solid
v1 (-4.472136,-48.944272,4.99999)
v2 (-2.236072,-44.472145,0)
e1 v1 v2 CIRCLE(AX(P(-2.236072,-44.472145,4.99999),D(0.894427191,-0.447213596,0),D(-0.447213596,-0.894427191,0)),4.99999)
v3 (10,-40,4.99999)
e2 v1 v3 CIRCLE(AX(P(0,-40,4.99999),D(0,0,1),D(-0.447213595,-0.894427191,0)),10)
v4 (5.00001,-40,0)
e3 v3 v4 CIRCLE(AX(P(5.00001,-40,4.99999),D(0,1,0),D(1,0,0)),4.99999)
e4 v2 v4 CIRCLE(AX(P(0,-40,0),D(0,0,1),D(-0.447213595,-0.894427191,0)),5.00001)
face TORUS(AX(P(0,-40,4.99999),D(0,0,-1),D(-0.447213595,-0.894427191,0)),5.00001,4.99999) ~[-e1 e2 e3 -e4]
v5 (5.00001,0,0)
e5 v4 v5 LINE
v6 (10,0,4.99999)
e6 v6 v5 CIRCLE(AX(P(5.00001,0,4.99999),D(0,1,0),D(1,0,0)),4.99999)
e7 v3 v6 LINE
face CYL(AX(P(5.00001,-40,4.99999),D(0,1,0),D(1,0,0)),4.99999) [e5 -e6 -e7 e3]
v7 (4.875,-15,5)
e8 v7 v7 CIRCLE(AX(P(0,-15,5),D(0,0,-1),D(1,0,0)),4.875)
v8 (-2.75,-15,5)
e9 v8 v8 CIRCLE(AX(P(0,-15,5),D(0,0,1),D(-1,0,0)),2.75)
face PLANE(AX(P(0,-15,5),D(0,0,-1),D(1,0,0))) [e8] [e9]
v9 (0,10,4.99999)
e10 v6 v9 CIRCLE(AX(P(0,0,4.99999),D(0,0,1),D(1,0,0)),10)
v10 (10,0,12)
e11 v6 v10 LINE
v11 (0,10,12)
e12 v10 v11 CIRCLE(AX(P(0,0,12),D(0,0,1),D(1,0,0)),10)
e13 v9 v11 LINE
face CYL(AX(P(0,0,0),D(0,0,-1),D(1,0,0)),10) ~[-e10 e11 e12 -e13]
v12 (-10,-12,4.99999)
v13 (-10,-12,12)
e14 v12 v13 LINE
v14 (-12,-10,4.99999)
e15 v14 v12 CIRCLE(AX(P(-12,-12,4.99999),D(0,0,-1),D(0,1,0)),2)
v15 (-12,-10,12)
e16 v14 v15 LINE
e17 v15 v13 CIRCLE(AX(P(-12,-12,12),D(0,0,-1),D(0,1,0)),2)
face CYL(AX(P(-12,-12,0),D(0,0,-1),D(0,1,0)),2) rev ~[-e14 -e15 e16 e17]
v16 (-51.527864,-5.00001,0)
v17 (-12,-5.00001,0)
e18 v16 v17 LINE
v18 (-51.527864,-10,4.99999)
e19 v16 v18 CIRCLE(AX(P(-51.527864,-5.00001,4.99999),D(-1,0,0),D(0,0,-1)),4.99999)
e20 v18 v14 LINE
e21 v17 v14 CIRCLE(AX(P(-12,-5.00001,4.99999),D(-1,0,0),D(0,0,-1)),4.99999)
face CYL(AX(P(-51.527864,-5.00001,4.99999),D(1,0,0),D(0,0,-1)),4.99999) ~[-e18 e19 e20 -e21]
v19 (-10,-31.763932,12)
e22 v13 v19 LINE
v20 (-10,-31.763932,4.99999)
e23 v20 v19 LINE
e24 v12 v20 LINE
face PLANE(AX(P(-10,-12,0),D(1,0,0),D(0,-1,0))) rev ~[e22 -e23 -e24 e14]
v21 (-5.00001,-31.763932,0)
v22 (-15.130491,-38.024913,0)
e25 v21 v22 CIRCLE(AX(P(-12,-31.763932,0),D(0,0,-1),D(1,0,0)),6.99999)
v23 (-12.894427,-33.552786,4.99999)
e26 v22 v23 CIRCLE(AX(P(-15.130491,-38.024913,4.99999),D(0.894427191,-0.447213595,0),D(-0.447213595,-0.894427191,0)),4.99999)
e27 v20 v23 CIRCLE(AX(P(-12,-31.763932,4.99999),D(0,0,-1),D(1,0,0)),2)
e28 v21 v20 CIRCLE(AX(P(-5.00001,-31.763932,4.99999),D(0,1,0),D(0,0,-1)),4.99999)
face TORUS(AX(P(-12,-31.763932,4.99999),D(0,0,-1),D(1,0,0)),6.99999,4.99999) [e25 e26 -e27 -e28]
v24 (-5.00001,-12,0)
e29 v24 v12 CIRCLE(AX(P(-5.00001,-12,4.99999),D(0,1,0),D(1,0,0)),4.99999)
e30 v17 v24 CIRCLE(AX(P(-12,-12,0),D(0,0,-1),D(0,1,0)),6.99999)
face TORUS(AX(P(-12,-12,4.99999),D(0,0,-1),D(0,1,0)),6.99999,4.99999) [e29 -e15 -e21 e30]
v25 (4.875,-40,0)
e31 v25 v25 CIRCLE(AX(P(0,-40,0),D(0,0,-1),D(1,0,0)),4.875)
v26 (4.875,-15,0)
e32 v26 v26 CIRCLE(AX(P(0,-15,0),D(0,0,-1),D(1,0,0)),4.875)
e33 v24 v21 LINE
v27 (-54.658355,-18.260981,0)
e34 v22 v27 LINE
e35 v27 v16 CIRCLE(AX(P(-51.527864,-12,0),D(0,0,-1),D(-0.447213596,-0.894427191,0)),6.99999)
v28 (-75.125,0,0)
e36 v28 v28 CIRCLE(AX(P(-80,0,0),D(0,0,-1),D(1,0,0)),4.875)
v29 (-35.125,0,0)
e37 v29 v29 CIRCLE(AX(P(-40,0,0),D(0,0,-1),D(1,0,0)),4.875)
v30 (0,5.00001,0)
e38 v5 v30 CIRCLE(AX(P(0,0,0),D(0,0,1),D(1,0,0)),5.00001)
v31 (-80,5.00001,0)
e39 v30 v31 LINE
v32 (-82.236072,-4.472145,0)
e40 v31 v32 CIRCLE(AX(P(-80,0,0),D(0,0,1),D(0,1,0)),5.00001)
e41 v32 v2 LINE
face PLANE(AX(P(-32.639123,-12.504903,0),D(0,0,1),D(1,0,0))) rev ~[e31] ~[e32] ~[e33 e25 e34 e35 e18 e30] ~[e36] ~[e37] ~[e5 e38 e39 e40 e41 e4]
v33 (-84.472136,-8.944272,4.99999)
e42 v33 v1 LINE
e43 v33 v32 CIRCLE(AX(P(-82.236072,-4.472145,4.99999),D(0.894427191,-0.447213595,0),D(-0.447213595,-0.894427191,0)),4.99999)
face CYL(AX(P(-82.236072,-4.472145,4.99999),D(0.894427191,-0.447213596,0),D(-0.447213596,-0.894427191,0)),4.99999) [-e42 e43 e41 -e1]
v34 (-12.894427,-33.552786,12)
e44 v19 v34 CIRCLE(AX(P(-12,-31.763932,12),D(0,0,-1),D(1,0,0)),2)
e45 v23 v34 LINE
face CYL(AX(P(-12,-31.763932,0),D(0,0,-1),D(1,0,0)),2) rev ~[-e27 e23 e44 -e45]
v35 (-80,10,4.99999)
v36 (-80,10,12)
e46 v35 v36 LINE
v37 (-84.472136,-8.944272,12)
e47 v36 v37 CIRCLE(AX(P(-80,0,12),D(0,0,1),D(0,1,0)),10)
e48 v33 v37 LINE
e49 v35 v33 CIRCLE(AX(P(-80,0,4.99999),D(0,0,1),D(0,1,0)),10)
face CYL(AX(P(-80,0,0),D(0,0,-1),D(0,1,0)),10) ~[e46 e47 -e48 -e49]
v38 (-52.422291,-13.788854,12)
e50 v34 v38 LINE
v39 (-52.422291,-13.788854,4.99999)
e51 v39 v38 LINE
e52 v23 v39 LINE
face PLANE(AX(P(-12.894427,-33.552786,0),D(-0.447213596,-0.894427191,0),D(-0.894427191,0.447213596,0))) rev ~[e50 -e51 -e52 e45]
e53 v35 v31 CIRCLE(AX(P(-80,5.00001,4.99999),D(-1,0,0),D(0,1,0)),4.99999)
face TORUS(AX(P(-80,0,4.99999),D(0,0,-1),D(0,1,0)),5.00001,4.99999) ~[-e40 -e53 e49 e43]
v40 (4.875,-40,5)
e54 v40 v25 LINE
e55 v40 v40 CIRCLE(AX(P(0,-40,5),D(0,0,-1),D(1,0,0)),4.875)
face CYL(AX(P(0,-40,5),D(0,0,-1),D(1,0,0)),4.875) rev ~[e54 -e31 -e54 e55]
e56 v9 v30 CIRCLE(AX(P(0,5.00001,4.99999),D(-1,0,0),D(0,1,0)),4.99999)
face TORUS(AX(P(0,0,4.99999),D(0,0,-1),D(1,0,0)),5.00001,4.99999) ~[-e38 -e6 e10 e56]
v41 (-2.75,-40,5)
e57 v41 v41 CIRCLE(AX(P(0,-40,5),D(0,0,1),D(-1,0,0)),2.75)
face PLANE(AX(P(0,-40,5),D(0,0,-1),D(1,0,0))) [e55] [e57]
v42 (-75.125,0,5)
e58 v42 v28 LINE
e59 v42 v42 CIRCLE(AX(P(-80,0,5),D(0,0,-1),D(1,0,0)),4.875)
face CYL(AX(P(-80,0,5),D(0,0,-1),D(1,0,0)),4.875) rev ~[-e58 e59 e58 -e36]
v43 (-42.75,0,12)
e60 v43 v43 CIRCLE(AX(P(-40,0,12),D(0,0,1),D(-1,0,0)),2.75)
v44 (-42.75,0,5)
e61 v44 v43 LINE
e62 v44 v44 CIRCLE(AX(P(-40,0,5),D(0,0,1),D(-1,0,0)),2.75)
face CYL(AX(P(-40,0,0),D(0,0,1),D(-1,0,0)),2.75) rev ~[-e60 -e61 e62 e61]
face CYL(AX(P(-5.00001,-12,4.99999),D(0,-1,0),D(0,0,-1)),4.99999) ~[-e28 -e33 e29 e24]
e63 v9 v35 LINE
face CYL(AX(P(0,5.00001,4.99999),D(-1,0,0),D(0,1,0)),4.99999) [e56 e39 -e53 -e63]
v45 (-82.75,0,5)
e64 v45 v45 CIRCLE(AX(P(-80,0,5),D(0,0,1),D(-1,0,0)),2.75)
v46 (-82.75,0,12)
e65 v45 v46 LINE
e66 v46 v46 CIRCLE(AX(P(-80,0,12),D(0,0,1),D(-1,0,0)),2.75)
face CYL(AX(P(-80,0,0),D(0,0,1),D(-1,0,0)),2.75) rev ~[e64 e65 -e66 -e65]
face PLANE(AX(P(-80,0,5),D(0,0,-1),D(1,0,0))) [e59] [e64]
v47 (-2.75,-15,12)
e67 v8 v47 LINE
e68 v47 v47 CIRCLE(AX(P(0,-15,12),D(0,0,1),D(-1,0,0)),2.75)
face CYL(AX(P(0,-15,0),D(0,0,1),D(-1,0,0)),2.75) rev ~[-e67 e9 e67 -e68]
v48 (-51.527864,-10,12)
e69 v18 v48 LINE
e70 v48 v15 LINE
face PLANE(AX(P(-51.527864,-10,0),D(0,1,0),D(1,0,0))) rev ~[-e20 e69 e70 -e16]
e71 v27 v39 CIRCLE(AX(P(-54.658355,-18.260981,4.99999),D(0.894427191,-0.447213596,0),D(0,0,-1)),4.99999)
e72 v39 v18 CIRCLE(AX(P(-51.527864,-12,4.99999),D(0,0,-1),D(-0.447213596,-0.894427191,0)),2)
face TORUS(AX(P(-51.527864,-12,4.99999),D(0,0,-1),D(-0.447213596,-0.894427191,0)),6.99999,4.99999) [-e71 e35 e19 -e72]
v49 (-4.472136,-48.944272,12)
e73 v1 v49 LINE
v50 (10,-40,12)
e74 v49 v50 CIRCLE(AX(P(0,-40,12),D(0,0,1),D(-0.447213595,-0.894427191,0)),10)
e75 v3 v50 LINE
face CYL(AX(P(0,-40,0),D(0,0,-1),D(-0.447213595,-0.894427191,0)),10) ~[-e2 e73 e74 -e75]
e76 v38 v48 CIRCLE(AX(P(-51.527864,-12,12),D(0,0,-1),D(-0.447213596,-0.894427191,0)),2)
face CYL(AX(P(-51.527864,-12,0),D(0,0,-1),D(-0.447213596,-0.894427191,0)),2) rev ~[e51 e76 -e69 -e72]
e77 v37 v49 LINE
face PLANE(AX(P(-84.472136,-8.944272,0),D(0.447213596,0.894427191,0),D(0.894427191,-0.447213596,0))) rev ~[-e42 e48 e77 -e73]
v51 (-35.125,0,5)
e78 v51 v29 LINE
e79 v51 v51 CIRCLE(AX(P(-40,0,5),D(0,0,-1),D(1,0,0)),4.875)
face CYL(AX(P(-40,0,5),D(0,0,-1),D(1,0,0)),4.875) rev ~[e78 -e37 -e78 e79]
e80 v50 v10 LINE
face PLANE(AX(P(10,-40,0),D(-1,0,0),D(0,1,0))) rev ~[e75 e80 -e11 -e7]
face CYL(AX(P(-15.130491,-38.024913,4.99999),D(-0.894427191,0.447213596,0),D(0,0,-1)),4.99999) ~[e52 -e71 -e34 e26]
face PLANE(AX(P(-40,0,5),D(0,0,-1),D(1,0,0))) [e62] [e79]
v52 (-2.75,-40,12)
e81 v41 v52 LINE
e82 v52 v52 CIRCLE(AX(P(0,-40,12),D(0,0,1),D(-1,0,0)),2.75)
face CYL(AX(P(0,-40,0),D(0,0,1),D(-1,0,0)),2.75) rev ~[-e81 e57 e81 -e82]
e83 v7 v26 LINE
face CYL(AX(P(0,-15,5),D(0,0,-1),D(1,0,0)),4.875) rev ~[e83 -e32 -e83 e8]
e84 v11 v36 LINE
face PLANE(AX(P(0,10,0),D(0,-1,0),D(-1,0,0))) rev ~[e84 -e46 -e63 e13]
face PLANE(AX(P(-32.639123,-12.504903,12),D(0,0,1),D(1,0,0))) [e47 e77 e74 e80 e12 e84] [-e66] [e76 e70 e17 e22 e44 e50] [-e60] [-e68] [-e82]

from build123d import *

# Parameters (mm, degrees)
F1_DEPTH       = 12
F2_D           = 5.5
F2_CBORE_D     = 9.75
F2_CBORE_DEPTH = 5
F3_R           = 4.99999


# Not quite as in the source:
# - a fillet or chamfer is up to 0.001 mm smaller than in the source, because OpenCascade refuses the exact size


with BuildPart() as f1:
    # F0 (on Top) → F1 (new body)
    with BuildSketch(Plane.XY):
        with BuildLine():
            ThreePointArc((-80, 10), (-89.7324898947, 2.2975292055), (-84.472135955, -8.94427191))
            Line((-84.472135955, -8.94427191), (-4.472135955, -48.94427191))
            ThreePointArc((-4.472135955, -48.94427191), (5.2573111212, -48.5065080835), (10, -40))
            Line((10, -40), (10, 0))
            ThreePointArc((10, 0), (7.0710678119, 7.0710678119), (0, 10))
            Line((0, 10), (-80, 10))
        make_face()
        with BuildLine():
            Line((-12.894427191, -33.5527864045), (-52.422291236, -13.788854382))
            ThreePointArc((-52.422291236, -13.788854382), (-53.4743620239, -11.5404941589), (-51.527864045, -10))
            Line((-51.527864045, -10), (-12, -10))
            ThreePointArc((-12, -10), (-10.5857864376, -10.5857864376), (-10, -12))
            Line((-10, -12), (-10, -31.7639320225))
            ThreePointArc((-10, -31.7639320225), (-10.9485377758, -33.4652336392), (-12.894427191, -33.5527864045))
        make_face(mode=Mode.SUBTRACT)
    extrude(amount=F1_DEPTH)

    # F2 (through all)
    with Locations(Plane(origin=(0, 0, 0), x_dir=(1, 0, 0), z_dir=(0, 0, -1))):
        with Locations((0, 40), (-40, 0), (-80, 0), (0, 15)):
            CounterBoreHole(F2_D / 2, F2_CBORE_D / 2, F2_CBORE_DEPTH)

    # F3 (radius 5 in the source; OpenCascade refuses exactly that, so slightly less here)
    f3_edges = [f1.edges().sort_by_distance(p)[0] for p in [
        (-40, 10, 0),
        (-31.763932, -10, 0),
    ]]
    fillet(f3_edges, radius=F3_R)


solid = f1.part
